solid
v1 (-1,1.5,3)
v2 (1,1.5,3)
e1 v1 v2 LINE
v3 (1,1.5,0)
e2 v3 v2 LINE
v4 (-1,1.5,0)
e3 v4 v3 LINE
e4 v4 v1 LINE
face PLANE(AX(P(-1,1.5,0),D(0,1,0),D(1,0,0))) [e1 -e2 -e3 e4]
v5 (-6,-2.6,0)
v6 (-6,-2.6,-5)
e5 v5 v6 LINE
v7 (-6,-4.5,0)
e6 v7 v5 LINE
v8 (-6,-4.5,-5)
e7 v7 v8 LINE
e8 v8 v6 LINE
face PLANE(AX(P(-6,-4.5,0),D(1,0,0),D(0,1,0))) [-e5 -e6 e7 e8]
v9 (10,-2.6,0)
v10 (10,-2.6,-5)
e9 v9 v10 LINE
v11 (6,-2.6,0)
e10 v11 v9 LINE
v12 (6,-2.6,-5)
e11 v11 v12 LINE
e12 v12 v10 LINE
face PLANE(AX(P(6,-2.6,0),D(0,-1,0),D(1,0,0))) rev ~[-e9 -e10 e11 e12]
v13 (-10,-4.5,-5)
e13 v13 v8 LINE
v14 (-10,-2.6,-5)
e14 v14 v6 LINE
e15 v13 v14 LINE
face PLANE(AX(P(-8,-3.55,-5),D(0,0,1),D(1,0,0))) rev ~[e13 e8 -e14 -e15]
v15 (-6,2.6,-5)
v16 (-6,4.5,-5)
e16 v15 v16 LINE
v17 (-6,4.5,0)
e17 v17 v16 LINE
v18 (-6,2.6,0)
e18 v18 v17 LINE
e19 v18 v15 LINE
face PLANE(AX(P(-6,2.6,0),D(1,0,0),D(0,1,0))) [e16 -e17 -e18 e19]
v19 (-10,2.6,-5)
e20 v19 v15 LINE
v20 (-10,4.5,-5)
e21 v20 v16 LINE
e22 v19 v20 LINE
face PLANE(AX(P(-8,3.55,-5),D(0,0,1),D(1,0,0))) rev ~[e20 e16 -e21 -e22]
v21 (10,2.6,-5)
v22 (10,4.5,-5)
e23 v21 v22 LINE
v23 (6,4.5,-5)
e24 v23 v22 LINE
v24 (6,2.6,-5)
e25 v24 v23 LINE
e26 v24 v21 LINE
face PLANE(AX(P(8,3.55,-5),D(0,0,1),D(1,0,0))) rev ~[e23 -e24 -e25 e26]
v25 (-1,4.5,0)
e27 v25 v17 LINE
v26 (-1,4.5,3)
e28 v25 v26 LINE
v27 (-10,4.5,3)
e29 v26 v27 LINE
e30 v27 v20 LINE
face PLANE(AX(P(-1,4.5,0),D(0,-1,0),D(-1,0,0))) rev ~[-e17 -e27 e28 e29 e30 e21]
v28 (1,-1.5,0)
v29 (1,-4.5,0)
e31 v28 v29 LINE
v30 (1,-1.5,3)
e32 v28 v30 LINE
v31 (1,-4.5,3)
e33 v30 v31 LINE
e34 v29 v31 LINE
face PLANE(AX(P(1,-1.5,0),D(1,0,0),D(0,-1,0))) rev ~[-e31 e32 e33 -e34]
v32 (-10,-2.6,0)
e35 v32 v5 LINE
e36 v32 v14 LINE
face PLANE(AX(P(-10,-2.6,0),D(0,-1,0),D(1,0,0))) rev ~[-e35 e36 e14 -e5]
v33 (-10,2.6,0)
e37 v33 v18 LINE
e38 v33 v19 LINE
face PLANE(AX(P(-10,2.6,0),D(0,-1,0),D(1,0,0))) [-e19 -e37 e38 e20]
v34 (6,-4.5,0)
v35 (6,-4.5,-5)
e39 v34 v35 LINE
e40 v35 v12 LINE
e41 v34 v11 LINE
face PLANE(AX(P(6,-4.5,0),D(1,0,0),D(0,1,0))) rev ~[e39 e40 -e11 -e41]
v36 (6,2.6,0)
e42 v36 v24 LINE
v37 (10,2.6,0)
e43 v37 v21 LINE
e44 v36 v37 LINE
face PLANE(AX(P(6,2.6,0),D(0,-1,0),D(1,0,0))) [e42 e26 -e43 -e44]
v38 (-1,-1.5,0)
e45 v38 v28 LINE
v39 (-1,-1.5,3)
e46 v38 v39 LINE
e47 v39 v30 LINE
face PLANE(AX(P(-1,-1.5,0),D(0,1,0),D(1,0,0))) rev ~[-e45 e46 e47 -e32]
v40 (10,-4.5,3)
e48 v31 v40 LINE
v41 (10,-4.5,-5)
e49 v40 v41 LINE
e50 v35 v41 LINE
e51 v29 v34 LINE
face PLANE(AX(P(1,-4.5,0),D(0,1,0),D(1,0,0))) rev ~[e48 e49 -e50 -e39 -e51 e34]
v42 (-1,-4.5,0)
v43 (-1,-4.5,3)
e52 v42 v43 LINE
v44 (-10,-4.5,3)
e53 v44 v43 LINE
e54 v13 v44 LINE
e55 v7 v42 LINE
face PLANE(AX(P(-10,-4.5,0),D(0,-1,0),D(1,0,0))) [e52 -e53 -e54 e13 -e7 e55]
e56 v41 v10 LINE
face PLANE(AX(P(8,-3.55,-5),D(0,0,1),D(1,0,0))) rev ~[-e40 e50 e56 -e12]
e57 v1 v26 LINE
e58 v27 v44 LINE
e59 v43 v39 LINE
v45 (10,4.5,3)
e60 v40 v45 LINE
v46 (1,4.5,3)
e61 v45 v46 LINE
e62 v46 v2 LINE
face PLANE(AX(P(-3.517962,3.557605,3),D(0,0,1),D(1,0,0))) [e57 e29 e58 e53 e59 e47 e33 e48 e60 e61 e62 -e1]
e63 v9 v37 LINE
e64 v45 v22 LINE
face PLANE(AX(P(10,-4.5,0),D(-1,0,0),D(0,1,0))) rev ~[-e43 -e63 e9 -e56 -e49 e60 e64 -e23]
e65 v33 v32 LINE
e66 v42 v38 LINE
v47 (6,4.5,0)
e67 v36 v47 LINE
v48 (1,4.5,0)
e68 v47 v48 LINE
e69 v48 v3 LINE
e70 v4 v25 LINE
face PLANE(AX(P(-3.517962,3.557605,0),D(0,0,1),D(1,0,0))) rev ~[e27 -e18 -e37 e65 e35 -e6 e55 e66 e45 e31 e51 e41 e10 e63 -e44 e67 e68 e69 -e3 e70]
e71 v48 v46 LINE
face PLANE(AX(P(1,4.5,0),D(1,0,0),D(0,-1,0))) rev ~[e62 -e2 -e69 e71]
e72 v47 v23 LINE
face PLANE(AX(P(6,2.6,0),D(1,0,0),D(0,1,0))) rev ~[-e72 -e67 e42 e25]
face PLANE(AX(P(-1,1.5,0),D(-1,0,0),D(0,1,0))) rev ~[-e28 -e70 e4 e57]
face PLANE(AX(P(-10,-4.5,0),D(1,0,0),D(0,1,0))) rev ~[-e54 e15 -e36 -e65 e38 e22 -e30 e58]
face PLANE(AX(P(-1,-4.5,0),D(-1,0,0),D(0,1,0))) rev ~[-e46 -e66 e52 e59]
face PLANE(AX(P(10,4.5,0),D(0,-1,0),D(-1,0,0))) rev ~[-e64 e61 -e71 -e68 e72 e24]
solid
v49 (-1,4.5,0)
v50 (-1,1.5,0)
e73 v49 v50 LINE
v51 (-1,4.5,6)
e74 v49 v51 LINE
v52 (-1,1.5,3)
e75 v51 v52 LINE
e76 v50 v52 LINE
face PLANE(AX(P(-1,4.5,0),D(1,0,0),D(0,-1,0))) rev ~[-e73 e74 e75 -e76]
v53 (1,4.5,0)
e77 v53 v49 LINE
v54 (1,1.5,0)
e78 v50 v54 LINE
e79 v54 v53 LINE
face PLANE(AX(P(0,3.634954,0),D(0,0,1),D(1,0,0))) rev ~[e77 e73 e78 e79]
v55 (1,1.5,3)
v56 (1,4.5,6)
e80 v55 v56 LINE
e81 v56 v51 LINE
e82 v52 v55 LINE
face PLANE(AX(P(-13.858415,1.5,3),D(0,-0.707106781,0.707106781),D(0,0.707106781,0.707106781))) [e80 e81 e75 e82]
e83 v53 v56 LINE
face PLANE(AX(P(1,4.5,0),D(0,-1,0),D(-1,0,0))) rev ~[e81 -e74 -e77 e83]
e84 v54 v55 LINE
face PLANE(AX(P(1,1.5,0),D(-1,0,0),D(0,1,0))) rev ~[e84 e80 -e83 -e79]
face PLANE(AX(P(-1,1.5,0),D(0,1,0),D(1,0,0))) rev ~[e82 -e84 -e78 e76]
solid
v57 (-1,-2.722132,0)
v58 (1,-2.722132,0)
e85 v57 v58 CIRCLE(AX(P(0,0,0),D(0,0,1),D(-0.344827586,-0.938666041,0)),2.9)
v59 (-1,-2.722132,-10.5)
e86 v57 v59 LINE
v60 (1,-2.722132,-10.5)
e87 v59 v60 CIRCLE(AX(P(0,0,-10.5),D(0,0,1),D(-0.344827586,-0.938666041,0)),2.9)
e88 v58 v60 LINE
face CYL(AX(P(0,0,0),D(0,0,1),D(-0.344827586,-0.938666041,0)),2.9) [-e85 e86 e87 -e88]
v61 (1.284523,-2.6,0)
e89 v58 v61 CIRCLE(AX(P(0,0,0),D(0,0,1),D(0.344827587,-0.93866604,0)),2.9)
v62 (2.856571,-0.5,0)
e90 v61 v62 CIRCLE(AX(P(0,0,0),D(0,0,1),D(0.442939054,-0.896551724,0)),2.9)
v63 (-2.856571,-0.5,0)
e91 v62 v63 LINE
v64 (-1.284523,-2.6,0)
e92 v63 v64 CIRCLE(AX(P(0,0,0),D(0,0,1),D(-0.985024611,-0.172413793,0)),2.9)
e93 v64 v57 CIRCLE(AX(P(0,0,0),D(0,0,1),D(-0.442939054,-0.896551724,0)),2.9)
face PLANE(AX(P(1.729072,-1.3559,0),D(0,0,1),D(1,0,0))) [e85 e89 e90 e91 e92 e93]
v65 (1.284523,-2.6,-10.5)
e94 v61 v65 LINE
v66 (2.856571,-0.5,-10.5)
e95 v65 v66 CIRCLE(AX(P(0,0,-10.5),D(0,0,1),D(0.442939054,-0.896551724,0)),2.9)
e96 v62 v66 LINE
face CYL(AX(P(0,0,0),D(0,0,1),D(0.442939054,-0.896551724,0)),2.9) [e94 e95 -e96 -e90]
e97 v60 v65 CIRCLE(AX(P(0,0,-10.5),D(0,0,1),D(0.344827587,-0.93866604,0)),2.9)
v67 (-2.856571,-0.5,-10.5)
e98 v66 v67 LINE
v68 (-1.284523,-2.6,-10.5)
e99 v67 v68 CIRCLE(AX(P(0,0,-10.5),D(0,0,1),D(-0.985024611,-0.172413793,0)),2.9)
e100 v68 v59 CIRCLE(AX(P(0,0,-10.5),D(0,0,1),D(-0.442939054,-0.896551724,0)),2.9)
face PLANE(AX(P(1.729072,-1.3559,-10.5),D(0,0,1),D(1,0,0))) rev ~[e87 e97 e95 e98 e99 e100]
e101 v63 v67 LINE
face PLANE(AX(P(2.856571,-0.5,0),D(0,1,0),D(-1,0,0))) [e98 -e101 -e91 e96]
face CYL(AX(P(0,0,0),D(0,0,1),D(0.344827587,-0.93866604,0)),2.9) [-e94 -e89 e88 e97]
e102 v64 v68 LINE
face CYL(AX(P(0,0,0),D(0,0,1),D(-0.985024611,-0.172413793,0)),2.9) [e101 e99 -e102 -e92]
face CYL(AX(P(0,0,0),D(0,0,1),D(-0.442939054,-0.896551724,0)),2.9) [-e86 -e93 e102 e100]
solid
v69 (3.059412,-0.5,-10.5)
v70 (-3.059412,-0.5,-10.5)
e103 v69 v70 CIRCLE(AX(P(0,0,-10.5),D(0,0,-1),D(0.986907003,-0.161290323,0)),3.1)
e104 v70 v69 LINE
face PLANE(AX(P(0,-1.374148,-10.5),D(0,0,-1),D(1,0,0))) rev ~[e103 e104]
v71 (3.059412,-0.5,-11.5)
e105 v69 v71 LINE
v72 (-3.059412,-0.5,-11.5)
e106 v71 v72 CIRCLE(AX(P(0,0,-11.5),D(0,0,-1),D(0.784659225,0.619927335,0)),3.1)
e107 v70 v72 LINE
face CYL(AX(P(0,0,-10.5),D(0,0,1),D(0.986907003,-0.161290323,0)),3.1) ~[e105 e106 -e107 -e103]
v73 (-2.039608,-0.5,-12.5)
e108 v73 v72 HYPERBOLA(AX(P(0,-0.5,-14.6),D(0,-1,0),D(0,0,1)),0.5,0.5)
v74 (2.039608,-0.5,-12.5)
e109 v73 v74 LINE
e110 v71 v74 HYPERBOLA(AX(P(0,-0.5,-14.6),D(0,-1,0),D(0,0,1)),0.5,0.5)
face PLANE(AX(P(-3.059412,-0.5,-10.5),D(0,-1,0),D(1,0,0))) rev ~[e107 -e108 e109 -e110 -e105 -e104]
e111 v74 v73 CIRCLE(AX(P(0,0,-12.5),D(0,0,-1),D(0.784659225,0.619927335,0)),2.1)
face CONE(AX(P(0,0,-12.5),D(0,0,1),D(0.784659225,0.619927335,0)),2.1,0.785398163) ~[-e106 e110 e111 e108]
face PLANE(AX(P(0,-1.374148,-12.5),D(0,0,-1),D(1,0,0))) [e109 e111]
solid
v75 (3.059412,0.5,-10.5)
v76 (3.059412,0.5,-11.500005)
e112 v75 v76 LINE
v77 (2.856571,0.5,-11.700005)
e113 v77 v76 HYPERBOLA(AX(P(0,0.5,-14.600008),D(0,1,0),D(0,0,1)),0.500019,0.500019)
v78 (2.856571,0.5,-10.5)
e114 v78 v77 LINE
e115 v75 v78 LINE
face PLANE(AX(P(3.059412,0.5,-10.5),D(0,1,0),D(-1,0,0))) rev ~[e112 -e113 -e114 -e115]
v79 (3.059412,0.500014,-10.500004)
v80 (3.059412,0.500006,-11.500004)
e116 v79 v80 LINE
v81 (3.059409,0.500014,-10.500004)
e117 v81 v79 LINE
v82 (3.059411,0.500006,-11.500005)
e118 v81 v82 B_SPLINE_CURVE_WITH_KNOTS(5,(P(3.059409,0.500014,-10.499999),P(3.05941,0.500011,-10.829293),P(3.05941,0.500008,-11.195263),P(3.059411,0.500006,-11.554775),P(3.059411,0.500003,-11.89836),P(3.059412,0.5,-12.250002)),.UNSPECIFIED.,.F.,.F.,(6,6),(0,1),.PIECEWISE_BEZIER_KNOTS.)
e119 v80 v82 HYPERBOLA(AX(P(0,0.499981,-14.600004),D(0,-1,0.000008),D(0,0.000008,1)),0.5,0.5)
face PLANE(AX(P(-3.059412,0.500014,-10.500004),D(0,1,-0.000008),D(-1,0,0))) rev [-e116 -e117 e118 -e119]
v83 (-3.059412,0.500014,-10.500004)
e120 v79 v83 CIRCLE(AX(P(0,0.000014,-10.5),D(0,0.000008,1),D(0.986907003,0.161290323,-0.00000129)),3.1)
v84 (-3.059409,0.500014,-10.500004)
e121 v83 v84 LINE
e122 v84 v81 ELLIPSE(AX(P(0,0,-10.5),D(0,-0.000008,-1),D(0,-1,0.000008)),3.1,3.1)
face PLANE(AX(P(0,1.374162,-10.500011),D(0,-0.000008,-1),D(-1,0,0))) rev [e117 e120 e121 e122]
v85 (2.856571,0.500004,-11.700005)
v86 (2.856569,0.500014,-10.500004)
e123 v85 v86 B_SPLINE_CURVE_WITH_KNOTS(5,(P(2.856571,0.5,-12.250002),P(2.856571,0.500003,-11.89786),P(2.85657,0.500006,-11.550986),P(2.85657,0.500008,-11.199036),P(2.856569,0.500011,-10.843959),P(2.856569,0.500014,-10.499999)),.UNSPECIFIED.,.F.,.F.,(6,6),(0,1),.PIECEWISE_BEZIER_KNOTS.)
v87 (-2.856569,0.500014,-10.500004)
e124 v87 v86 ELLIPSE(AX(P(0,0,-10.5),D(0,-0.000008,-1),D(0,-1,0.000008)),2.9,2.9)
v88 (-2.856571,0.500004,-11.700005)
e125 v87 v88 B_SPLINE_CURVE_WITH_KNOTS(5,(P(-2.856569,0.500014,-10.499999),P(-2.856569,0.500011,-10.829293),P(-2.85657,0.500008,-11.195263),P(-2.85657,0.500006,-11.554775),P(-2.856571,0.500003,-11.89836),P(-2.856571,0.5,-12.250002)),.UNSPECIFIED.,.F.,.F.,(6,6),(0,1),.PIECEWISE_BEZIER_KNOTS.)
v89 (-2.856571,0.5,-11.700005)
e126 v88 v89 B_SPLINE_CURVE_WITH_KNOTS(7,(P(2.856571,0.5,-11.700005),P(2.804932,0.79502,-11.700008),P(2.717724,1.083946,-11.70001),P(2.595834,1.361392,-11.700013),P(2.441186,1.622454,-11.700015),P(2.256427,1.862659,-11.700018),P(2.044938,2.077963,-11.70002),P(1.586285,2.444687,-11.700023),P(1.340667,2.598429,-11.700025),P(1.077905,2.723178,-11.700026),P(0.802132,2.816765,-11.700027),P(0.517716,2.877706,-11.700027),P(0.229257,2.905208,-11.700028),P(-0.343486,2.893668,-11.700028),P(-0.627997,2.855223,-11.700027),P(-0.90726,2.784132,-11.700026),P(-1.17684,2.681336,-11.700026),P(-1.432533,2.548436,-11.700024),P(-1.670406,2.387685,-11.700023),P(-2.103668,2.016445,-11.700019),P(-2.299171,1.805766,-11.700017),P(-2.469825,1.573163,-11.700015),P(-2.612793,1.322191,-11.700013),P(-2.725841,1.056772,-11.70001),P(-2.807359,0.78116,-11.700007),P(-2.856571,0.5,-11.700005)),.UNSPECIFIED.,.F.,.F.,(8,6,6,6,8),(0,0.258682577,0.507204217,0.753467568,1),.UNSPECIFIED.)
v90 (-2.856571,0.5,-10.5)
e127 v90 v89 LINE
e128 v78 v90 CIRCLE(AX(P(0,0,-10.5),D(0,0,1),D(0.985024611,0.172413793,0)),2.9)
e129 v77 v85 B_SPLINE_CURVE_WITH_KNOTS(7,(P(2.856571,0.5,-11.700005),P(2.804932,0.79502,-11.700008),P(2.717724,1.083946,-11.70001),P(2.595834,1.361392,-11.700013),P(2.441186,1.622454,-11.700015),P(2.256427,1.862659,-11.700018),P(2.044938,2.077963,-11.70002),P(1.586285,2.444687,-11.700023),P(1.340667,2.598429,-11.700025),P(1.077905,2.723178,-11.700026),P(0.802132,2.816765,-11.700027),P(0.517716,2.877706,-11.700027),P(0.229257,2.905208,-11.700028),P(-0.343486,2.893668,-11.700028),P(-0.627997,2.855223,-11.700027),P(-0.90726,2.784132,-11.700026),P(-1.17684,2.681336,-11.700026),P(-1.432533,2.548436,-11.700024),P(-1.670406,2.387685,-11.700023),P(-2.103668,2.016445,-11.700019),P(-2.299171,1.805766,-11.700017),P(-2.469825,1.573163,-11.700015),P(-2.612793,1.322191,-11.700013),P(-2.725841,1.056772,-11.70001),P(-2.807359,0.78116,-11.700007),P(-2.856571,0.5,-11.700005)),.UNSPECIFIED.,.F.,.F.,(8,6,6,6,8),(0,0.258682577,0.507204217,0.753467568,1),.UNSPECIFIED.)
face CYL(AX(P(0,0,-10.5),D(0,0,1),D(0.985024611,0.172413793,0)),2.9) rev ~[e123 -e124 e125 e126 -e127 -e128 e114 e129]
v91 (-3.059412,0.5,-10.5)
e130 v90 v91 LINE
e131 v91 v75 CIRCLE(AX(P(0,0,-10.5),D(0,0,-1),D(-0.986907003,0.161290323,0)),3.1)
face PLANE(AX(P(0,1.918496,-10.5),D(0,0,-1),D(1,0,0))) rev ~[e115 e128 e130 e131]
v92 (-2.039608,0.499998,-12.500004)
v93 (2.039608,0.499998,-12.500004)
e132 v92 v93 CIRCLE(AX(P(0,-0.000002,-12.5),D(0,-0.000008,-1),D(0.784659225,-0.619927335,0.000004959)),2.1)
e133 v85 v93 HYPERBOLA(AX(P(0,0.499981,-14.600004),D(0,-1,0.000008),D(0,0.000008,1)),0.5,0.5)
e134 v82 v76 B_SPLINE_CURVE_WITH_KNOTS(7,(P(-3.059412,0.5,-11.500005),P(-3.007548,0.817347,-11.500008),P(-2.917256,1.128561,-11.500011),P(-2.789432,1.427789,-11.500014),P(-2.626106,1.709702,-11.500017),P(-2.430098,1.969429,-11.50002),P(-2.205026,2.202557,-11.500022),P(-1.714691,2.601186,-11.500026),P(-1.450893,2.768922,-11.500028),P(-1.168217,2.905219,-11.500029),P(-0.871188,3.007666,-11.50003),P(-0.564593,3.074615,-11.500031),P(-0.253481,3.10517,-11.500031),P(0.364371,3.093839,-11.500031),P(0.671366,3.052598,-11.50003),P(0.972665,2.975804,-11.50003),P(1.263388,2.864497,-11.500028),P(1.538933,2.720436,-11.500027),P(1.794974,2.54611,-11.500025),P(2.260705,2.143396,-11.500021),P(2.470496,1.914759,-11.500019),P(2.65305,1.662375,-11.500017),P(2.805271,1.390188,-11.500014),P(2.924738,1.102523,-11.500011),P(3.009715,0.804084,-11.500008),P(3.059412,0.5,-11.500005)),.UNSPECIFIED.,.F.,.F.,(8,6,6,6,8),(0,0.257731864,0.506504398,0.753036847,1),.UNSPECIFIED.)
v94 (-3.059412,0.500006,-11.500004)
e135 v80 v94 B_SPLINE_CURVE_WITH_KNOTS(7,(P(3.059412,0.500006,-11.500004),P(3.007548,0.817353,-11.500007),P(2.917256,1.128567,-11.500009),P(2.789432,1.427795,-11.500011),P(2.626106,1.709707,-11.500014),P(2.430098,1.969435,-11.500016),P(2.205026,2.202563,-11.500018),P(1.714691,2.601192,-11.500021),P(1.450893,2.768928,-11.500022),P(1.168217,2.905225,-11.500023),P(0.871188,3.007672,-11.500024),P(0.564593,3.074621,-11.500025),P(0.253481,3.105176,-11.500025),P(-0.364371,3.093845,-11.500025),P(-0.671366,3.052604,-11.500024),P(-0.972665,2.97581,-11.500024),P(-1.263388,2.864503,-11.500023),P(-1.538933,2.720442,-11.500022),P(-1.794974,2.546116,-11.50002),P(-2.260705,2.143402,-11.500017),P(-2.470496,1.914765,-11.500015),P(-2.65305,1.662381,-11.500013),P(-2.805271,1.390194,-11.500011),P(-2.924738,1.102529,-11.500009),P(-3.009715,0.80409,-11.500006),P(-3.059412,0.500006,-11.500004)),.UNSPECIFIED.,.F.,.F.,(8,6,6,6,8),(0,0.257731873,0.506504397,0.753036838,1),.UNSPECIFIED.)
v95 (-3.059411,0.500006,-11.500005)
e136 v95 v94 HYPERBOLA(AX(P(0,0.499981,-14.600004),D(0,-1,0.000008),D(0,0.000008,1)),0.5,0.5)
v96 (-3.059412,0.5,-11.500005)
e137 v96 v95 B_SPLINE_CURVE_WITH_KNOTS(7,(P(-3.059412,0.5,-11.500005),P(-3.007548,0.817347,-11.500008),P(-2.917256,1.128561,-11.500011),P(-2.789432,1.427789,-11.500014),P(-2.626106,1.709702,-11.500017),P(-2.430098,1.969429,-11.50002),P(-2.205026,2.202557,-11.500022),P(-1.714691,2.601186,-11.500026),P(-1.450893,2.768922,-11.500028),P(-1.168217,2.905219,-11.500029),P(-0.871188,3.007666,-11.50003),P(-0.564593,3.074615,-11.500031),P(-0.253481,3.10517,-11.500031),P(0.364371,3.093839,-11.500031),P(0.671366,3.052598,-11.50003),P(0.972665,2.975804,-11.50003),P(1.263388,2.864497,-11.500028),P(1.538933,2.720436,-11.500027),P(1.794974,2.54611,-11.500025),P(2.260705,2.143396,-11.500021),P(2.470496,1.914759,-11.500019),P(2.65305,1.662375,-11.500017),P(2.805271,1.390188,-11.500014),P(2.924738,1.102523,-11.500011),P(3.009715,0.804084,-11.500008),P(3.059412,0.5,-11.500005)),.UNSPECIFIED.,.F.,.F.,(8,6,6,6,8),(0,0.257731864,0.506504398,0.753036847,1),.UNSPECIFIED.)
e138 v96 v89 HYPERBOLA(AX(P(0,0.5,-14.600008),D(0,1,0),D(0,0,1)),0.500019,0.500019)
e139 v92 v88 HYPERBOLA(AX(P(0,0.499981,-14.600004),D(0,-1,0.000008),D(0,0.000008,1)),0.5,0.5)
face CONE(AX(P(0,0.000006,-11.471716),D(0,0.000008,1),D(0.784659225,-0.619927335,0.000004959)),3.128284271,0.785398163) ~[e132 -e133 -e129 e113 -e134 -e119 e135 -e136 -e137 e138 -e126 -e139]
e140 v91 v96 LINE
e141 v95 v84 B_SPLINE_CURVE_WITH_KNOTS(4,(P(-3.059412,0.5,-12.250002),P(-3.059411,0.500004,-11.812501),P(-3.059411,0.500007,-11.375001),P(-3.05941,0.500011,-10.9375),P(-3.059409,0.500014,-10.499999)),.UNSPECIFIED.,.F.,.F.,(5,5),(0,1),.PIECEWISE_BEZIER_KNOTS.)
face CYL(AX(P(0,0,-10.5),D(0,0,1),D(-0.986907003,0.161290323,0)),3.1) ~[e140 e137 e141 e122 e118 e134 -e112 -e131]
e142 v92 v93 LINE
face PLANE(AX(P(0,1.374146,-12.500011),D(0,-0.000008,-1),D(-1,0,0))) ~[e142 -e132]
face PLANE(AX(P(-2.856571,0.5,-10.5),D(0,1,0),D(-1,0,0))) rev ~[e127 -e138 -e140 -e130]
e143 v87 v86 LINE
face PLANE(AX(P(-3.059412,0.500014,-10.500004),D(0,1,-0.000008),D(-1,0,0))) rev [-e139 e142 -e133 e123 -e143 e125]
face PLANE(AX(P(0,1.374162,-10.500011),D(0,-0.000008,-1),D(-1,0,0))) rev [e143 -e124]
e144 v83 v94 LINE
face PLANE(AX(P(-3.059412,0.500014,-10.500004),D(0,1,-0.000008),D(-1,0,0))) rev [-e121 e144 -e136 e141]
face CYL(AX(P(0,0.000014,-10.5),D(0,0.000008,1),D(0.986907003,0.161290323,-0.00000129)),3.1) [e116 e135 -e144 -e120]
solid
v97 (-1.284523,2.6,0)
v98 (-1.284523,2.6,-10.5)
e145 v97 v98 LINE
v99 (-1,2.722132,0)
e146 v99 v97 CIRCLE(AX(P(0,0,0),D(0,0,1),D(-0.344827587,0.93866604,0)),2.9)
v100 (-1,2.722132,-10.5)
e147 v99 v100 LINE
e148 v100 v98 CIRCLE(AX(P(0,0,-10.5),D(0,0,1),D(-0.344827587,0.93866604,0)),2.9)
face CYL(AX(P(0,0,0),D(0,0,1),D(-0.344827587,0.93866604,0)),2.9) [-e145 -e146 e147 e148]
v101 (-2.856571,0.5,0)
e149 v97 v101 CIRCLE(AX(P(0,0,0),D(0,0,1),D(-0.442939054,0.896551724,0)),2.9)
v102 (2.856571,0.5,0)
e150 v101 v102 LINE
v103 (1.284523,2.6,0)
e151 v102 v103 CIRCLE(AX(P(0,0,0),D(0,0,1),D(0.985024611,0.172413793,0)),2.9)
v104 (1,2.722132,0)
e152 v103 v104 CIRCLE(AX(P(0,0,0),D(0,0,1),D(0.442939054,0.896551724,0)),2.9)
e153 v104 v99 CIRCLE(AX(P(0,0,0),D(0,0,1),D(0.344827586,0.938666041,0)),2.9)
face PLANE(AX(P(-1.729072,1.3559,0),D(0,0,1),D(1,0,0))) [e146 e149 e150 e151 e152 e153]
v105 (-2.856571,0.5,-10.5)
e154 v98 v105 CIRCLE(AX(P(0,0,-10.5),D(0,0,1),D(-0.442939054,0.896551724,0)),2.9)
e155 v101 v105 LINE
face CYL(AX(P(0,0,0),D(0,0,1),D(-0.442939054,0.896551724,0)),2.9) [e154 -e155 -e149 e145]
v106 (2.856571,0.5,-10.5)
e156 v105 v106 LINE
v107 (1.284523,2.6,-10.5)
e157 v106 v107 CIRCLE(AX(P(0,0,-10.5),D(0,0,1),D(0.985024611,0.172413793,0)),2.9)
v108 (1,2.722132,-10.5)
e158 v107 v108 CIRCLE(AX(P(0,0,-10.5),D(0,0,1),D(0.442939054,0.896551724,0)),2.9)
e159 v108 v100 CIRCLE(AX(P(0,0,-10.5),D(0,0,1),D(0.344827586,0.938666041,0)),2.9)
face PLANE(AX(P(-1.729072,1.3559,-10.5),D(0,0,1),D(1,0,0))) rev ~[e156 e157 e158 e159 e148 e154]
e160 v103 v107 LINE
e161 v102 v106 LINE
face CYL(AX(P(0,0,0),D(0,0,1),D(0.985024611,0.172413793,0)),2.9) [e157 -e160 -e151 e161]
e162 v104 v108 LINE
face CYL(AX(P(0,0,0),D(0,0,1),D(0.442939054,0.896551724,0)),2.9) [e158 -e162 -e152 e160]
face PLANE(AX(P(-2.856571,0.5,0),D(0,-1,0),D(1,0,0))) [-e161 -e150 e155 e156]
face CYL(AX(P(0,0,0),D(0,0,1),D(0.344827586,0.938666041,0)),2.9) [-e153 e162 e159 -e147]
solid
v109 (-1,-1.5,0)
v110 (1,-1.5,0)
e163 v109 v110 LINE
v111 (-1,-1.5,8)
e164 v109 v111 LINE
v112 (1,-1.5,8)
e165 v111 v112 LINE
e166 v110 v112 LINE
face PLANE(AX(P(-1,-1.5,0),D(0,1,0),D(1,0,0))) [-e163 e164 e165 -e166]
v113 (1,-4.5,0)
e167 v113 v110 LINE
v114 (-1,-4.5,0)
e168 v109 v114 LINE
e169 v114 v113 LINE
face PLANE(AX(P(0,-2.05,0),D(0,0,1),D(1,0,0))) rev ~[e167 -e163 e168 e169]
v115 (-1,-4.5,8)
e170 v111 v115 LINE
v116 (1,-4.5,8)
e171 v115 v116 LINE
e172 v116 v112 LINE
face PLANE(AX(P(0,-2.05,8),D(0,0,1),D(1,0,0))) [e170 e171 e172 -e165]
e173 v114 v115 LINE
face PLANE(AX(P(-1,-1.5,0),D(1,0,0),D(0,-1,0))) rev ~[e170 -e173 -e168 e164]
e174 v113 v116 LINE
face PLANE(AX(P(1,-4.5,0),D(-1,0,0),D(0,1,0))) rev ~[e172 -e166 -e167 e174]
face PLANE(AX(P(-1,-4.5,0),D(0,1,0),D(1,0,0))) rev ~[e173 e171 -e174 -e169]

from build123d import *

# Parameters (mm, degrees)
F0_W          = 2
F0_H          = 1.1
F0_H_2        = 1
F1_DEPTH      = 10.5
F2_DEPTH      = 8
F0_W_2        = 4
F0_H_3        = 1.9
F3_DEPTH      = 3
F4_DEPTH      = 5
F5_T1_DEPTH   = 27.7168298797
F7_DEPTH      = 2
F8_T2_ANGLE   = 256.6216565717
F8_2_T2_ANGLE = 256.6216565717


# Not quite as in the source:
# - a fillet or chamfer that OpenCascade refuses, or shapes differently, is made with other operations: its cross-section is extruded or revolved along the edge and cut away or added
# - a pattern or mirror of a feature is missing from the dataset's text; its kind, count and spacing are read off the source's solid


with BuildPart() as f1:
    # F0 (on Top) → F1 (new body)
    with BuildSketch(Plane.XY):
        with BuildLine():
            Line((-2.8565713714, 0.5), (-1, 0.5))
            Line((-1, 0.5), (-1, 1.5))
            Line((-1, 1.5), (-1, 2.6))
            Line((-1, 2.6), (-1.2845232579, 2.6))
            ThreePointArc((-1.2845232579, 2.6), (-2.3215654594, 1.7379107623), (-2.8565713714, 0.5))
        make_face()
        with Locations((0, 2.05)):
            Rectangle(F0_W, F0_H)
        with Locations((0, 1)):
            Rectangle(F0_W, F0_H_2)
        with BuildLine():
            Line((1, 0.5), (2.8565713714, 0.5))
            ThreePointArc((2.8565713714, 0.5), (2.3215654594, 1.7379107623), (1.2845232579, 2.6))
            Line((1.2845232579, 2.6), (1, 2.6))
            Line((1, 2.6), (1, 1.5))
            Line((1, 1.5), (1, 0.5))
        make_face()
        with BuildLine():
            Line((1, 2.6), (1, 2.7221315178))
            ThreePointArc((1, 2.7221315178), (0, 2.9), (-1, 2.7221315178))
            Line((-1, 2.7221315178), (-1, 2.6))
            Line((-1, 2.6), (1, 2.6))
        make_face()
        with BuildLine():
            Line((-1, 2.6), (-1, 2.7221315178))
            ThreePointArc((-1, 2.7221315178), (-1.1438927641, 2.6648657272), (-1.2845232579, 2.6))
            Line((-1.2845232579, 2.6), (-1, 2.6))
        make_face()
        with BuildLine():
            Line((1, 2.6), (1.2845232579, 2.6))
            ThreePointArc((1.2845232579, 2.6), (1.1438927641, 2.6648657272), (1, 2.7221315178))
            Line((1, 2.7221315178), (1, 2.6))
        make_face()
    extrude(amount=-F1_DEPTH)


with BuildPart() as f1b:
    # F0 (on Top) → F1, piece 2 (new body)
    with BuildSketch(Plane.XY):
        with BuildLine():
            ThreePointArc((1.2845232579, -2.6), (2.3215654594, -1.7379107623), (2.8565713714, -0.5))
            Line((2.8565713714, -0.5), (1, -0.5))
            Line((1, -0.5), (1, -1.5))
            Line((1, -1.5), (1, -2.6))
            Line((1, -2.6), (1.2845232579, -2.6))
        make_face()
        with Locations((0, -2.05)):
            Rectangle(F0_W, F0_H)
        with Locations((0, -1)):
            Rectangle(F0_W, F0_H_2)
        with BuildLine():
            Line((-1, -1.5), (-1, -0.5))
            Line((-1, -0.5), (-2.8565713714, -0.5))
            ThreePointArc((-2.8565713714, -0.5), (-2.3215654594, -1.7379107623), (-1.2845232579, -2.6))
            Line((-1.2845232579, -2.6), (-1, -2.6))
            Line((-1, -2.6), (-1, -1.5))
        make_face()
        with BuildLine():
            ThreePointArc((-1, -2.7221315178), (0, -2.9), (1, -2.7221315178))
            Line((1, -2.7221315178), (1, -2.6))
            Line((1, -2.6), (-1, -2.6))
            Line((-1, -2.6), (-1, -2.7221315178))
        make_face()
        with BuildLine():
            ThreePointArc((-1.2845232579, -2.6), (-1.1438927641, -2.6648657272), (-1, -2.7221315178))
            Line((-1, -2.7221315178), (-1, -2.6))
            Line((-1, -2.6), (-1.2845232579, -2.6))
        make_face()
        with BuildLine():
            ThreePointArc((1, -2.7221315178), (1.1438927641, -2.6648657272), (1.2845232579, -2.6))
            Line((1.2845232579, -2.6), (1, -2.6))
            Line((1, -2.6), (1, -2.7221315178))
        make_face()
    extrude(amount=-F1_DEPTH)


with BuildPart() as f2:
    # F0 (on Top) → F2 (new body)
    with BuildSketch(Plane.XY):
        with BuildLine():
            ThreePointArc((-1, 2.7221315178), (0, 2.9), (1, 2.7221315178))
            Line((1, 2.7221315178), (1, 4.5))
            Line((1, 4.5), (-1, 4.5))
            Line((-1, 4.5), (-1, 2.7221315178))
        make_face()
        with Locations((0, 2.05)):
            Rectangle(F0_W, F0_H)
        with BuildLine():
            Line((1, 2.6), (1, 2.7221315178))
            ThreePointArc((1, 2.7221315178), (0, 2.9), (-1, 2.7221315178))
            Line((-1, 2.7221315178), (-1, 2.6))
            Line((-1, 2.6), (1, 2.6))
        make_face()
    extrude(amount=F2_DEPTH)

    # F5: chamfer of 5 on 1 edges, made by hand

    # F5_s2 → F5_t1 (cut)
    with BuildSketch(Plane.YZ.offset(-13.8584149398)):
        Polygon((1.5, 3), (6.5, 8), (1.5, 8), align=None)
    extrude(amount=F5_T1_DEPTH, mode=Mode.SUBTRACT)


with BuildPart() as f2b:
    # F0 (on Top) → F2, piece 2 (new body)
    with BuildSketch(Plane.XY):
        with Locations((0, -2.05)):
            Rectangle(F0_W, F0_H)
        with BuildLine():
            ThreePointArc((-1, -2.7221315178), (0, -2.9), (1, -2.7221315178))
            Line((1, -2.7221315178), (1, -2.6))
            Line((1, -2.6), (-1, -2.6))
            Line((-1, -2.6), (-1, -2.7221315178))
        make_face()
        with BuildLine():
            Line((1, -4.5), (1, -2.7221315178))
            ThreePointArc((1, -2.7221315178), (0, -2.9), (-1, -2.7221315178))
            Line((-1, -2.7221315178), (-1, -4.5))
            Line((-1, -4.5), (1, -4.5))
        make_face()
    extrude(amount=F2_DEPTH)


with BuildPart() as f3:
    # F0 (on Top) → F3 (new body)
    with BuildSketch(Plane.XY):
        with BuildLine():
            ThreePointArc((-1.2845232579, 2.6), (-1.1438927641, 2.6648657272), (-1, 2.7221315178))
            Line((-1, 2.7221315178), (-1, 4.5))
            Line((-1, 4.5), (-6, 4.5))
            Line((-6, 4.5), (-6, 2.6))
            Line((-6, 2.6), (-1.2845232579, 2.6))
        make_face()
        with BuildLine():
            Line((-10, 0.5), (-2.8565713714, 0.5))
            ThreePointArc((-2.8565713714, 0.5), (-2.3215654594, 1.7379107623), (-1.2845232579, 2.6))
            Line((-1.2845232579, 2.6), (-6, 2.6))
            Line((-6, 2.6), (-10, 2.6))
            Line((-10, 2.6), (-10, 0.5))
        make_face()
        with BuildLine():
            Line((-2.8565713714, 0.5), (-1, 0.5))
            Line((-1, 0.5), (-1, 1.5))
            Line((-1, 1.5), (-1, 2.6))
            Line((-1, 2.6), (-1.2845232579, 2.6))
            ThreePointArc((-1.2845232579, 2.6), (-2.3215654594, 1.7379107623), (-2.8565713714, 0.5))
        make_face()
        with BuildLine():
            ThreePointArc((-2.8565713714, -0.5), (-2.9, 0), (-2.8565713714, 0.5))
            Line((-2.8565713714, 0.5), (-10, 0.5))
            Line((-10, 0.5), (-10, -0.5))
            Line((-10, -0.5), (-2.8565713714, -0.5))
        make_face()
        with BuildLine():
            Line((-1, -0.5), (-1, 0.5))
            Line((-1, 0.5), (-2.8565713714, 0.5))
            ThreePointArc((-2.8565713714, 0.5), (-2.9, 0), (-2.8565713714, -0.5))
            Line((-2.8565713714, -0.5), (-1, -0.5))
        make_face()
        with BuildLine():
            Line((-1, -1.5), (-1, -0.5))
            Line((-1, -0.5), (-2.8565713714, -0.5))
            ThreePointArc((-2.8565713714, -0.5), (-2.3215654594, -1.7379107623), (-1.2845232579, -2.6))
            Line((-1.2845232579, -2.6), (-1, -2.6))
            Line((-1, -2.6), (-1, -1.5))
        make_face()
        with BuildLine():
            ThreePointArc((-1.2845232579, -2.6), (-2.3215654594, -1.7379107623), (-2.8565713714, -0.5))
            Line((-2.8565713714, -0.5), (-10, -0.5))
            Line((-10, -0.5), (-10, -2.6))
            Line((-10, -2.6), (-6, -2.6))
            Line((-6, -2.6), (-1.2845232579, -2.6))
        make_face()
        with BuildLine():
            Line((-1, -4.5), (-1, -2.7221315178))
            ThreePointArc((-1, -2.7221315178), (-1.1438927641, -2.6648657272), (-1.2845232579, -2.6))
            Line((-1.2845232579, -2.6), (-6, -2.6))
            Line((-6, -2.6), (-6, -4.5))
            Line((-6, -4.5), (-1, -4.5))
        make_face()
        with Locations((0, 1)):
            Rectangle(F0_W, F0_H_2)
        Rectangle(F0_W, F0_H_2)
        with Locations((0, -1)):
            Rectangle(F0_W, F0_H_2)
        with BuildLine():
            ThreePointArc((1, 2.7221315178), (1.1438927641, 2.6648657272), (1.2845232579, 2.6))
            Line((1.2845232579, 2.6), (6, 2.6))
            Line((6, 2.6), (6, 4.5))
            Line((6, 4.5), (1, 4.5))
            Line((1, 4.5), (1, 2.7221315178))
        make_face()
        with BuildLine():
            Line((1, 0.5), (2.8565713714, 0.5))
            ThreePointArc((2.8565713714, 0.5), (2.3215654594, 1.7379107623), (1.2845232579, 2.6))
            Line((1.2845232579, 2.6), (1, 2.6))
            Line((1, 2.6), (1, 1.5))
            Line((1, 1.5), (1, 0.5))
        make_face()
        with BuildLine():
            Line((1, 2.6), (1.2845232579, 2.6))
            ThreePointArc((1.2845232579, 2.6), (1.1438927641, 2.6648657272), (1, 2.7221315178))
            Line((1, 2.7221315178), (1, 2.6))
        make_face()
        with BuildLine():
            ThreePointArc((1.2845232579, 2.6), (2.3215654594, 1.7379107623), (2.8565713714, 0.5))
            Line((2.8565713714, 0.5), (10, 0.5))
            Line((10, 0.5), (10, 2.6))
            Line((10, 2.6), (6, 2.6))
            Line((6, 2.6), (1.2845232579, 2.6))
        make_face()
        with BuildLine():
            ThreePointArc((2.8565713714, 0.5), (2.8891224426, 0.250941251), (2.9, 0))
            ThreePointArc((2.9, 0), (2.8891224426, -0.250941251), (2.8565713714, -0.5))
            Line((2.8565713714, -0.5), (10, -0.5))
            Line((10, -0.5), (10, 0.5))
            Line((10, 0.5), (2.8565713714, 0.5))
        make_face()
        with BuildLine():
            ThreePointArc((2.8565713714, -0.5), (2.8891224426, -0.250941251), (2.9, 0))
            ThreePointArc((2.9, 0), (2.8891224426, 0.250941251), (2.8565713714, 0.5))
            Line((2.8565713714, 0.5), (1, 0.5))
            Line((1, 0.5), (1, -0.5))
            Line((1, -0.5), (2.8565713714, -0.5))
        make_face()
        with BuildLine():
            ThreePointArc((1.2845232579, -2.6), (2.3215654594, -1.7379107623), (2.8565713714, -0.5))
            Line((2.8565713714, -0.5), (1, -0.5))
            Line((1, -0.5), (1, -1.5))
            Line((1, -1.5), (1, -2.6))
            Line((1, -2.6), (1.2845232579, -2.6))
        make_face()
        with BuildLine():
            Line((10, -0.5), (2.8565713714, -0.5))
            ThreePointArc((2.8565713714, -0.5), (2.3215654594, -1.7379107623), (1.2845232579, -2.6))
            Line((1.2845232579, -2.6), (6, -2.6))
            Line((6, -2.6), (10, -2.6))
            Line((10, -2.6), (10, -0.5))
        make_face()
        with BuildLine():
            ThreePointArc((1, -2.7221315178), (1.1438927641, -2.6648657272), (1.2845232579, -2.6))
            Line((1.2845232579, -2.6), (1, -2.6))
            Line((1, -2.6), (1, -2.7221315178))
        make_face()
        with BuildLine():
            Line((6, -2.6), (1.2845232579, -2.6))
            ThreePointArc((1.2845232579, -2.6), (1.1438927641, -2.6648657272), (1, -2.7221315178))
            Line((1, -2.7221315178), (1, -4.5))
            Line((1, -4.5), (6, -4.5))
            Line((6, -4.5), (6, -2.6))
        make_face()
        with BuildLine():
            ThreePointArc((-1.2845232579, -2.6), (-1.1438927641, -2.6648657272), (-1, -2.7221315178))
            Line((-1, -2.7221315178), (-1, -2.6))
            Line((-1, -2.6), (-1.2845232579, -2.6))
        make_face()
        with BuildLine():
            Line((-1, 2.6), (-1, 2.7221315178))
            ThreePointArc((-1, 2.7221315178), (-1.1438927641, 2.6648657272), (-1.2845232579, 2.6))
            Line((-1.2845232579, 2.6), (-1, 2.6))
        make_face()
        with Locations((-8, 3.55)):
            Rectangle(F0_W_2, F0_H_3)
        with Locations((-8, -3.55)):
            Rectangle(F0_W_2, F0_H_3)
        with Locations((8, 3.55)):
            Rectangle(F0_W_2, F0_H_3)
        with Locations((8, -3.55)):
            Rectangle(F0_W_2, F0_H_3)
    extrude(amount=F3_DEPTH)

    # F0 (on Top) → F4 (join)
    with BuildSketch(Plane.XY):
        with Locations((-8, -3.55)):
            Rectangle(F0_W_2, F0_H_3)
        with Locations((-8, 3.55)):
            Rectangle(F0_W_2, F0_H_3)
        with Locations((8, -3.55)):
            Rectangle(F0_W_2, F0_H_3)
        with Locations((8, 3.55)):
            Rectangle(F0_W_2, F0_H_3)
    extrude(amount=-F4_DEPTH)


with BuildPart() as f7:
    # F6 (on face) → F7 (new body)
    with BuildSketch(Plane(origin=(0, 0, -10.5), x_dir=(1, 0, 0), z_dir=(0, 0, -1))):
        with BuildLine():
            Line((0, 0.5), (3.0594117082, 0.5))
            ThreePointArc((3.0594117082, 0.5), (0, 3.1), (-3.0594117082, 0.5))
            Line((-3.0594117082, 0.5), (0, 0.5))
        make_face()
    extrude(amount=F7_DEPTH)


with BuildPart() as f7b:
    # F6 (on face) → F7, piece 2 (new body)
    with BuildSketch(Plane(origin=(0, 0, -10.5), x_dir=(1, 0, 0), z_dir=(0, 0, -1))):
        with BuildLine():
            ThreePointArc((-3.0594117082, -0.5), (0, -3.1), (3.0594117082, -0.5))
            Line((3.0594117082, -0.5), (2.8565713714, -0.5))
            ThreePointArc((2.8565713714, -0.5), (0, -2.9), (-2.8565713714, -0.5))
            Line((-2.8565713714, -0.5), (-3.0594117082, -0.5))
        make_face()
    extrude(amount=F7_DEPTH)

    # F7_copies: F7 across plane
    add(f7.part.mirror(Plane(origin=(0, 4.9e-05, 0), x_dir=(0, 4e-06, 1), z_dir=(0, 1, -4e-06))))

    # F8#2: chamfer of 1 on 2 edges, made by hand

    # F8_2_s1 → F8_2_t2 (revolve, cut)
    with BuildSketch(Plane(origin=(4.76703e-05, 6.03376e-05, -5e-10), x_dir=(0.7846592249, -0.619927335, 0), z_dir=(-0.619927335, -0.7846592249, 6.2773e-06))):
        with BuildLine():
            Line((3.1282804114, -11.471700214), (2.0717171089, -12.5282739965))
            Line((2.0717171089, -12.5282739965), (2.071717208, -12.5482739965))
            ThreePointArc((2.071717208, -12.5482739965), (2.5858592034, -12.5199871754), (3.100001339, -12.5199846256))
            Line((3.100001339, -12.5199846256), (3.1200012398, -12.4999845264))
            ThreePointArc((3.1200012398, -12.4999845264), (3.11999869, -11.9858423908), (3.1482804114, -11.4717001149))
            Line((3.1482804114, -11.4717001149), (3.1282804114, -11.471700214))
        make_face()
    revolve(axis=Axis((0, -2e-06, -12.5), (0, 8e-06, 1)), revolution_arc=F8_2_T2_ANGLE, mode=Mode.SUBTRACT)


with BuildPart() as f7_1:
    add(f7.part)

    # F8: chamfer of 1 on 1 edges, made by hand

    # F8_s1 → F8_t2 (revolve, cut)
    with BuildSketch(Plane(origin=(0, 0, 0), x_dir=(0, 0, 1), z_dir=(-0.619927335, 0.784659225, 0))):
        Polygon((-12.5, 2.1), (-11.5, 3.1), (-12.5, 3.1), align=None)
    revolve(axis=Axis((0, 0, -12.5), (0, 0, -1)), revolution_arc=F8_T2_ANGLE, mode=Mode.SUBTRACT)


solid = Compound([f1.part, f1b.part, f2.part, f2b.part, f3.part, f7b.part, f7_1.part])
